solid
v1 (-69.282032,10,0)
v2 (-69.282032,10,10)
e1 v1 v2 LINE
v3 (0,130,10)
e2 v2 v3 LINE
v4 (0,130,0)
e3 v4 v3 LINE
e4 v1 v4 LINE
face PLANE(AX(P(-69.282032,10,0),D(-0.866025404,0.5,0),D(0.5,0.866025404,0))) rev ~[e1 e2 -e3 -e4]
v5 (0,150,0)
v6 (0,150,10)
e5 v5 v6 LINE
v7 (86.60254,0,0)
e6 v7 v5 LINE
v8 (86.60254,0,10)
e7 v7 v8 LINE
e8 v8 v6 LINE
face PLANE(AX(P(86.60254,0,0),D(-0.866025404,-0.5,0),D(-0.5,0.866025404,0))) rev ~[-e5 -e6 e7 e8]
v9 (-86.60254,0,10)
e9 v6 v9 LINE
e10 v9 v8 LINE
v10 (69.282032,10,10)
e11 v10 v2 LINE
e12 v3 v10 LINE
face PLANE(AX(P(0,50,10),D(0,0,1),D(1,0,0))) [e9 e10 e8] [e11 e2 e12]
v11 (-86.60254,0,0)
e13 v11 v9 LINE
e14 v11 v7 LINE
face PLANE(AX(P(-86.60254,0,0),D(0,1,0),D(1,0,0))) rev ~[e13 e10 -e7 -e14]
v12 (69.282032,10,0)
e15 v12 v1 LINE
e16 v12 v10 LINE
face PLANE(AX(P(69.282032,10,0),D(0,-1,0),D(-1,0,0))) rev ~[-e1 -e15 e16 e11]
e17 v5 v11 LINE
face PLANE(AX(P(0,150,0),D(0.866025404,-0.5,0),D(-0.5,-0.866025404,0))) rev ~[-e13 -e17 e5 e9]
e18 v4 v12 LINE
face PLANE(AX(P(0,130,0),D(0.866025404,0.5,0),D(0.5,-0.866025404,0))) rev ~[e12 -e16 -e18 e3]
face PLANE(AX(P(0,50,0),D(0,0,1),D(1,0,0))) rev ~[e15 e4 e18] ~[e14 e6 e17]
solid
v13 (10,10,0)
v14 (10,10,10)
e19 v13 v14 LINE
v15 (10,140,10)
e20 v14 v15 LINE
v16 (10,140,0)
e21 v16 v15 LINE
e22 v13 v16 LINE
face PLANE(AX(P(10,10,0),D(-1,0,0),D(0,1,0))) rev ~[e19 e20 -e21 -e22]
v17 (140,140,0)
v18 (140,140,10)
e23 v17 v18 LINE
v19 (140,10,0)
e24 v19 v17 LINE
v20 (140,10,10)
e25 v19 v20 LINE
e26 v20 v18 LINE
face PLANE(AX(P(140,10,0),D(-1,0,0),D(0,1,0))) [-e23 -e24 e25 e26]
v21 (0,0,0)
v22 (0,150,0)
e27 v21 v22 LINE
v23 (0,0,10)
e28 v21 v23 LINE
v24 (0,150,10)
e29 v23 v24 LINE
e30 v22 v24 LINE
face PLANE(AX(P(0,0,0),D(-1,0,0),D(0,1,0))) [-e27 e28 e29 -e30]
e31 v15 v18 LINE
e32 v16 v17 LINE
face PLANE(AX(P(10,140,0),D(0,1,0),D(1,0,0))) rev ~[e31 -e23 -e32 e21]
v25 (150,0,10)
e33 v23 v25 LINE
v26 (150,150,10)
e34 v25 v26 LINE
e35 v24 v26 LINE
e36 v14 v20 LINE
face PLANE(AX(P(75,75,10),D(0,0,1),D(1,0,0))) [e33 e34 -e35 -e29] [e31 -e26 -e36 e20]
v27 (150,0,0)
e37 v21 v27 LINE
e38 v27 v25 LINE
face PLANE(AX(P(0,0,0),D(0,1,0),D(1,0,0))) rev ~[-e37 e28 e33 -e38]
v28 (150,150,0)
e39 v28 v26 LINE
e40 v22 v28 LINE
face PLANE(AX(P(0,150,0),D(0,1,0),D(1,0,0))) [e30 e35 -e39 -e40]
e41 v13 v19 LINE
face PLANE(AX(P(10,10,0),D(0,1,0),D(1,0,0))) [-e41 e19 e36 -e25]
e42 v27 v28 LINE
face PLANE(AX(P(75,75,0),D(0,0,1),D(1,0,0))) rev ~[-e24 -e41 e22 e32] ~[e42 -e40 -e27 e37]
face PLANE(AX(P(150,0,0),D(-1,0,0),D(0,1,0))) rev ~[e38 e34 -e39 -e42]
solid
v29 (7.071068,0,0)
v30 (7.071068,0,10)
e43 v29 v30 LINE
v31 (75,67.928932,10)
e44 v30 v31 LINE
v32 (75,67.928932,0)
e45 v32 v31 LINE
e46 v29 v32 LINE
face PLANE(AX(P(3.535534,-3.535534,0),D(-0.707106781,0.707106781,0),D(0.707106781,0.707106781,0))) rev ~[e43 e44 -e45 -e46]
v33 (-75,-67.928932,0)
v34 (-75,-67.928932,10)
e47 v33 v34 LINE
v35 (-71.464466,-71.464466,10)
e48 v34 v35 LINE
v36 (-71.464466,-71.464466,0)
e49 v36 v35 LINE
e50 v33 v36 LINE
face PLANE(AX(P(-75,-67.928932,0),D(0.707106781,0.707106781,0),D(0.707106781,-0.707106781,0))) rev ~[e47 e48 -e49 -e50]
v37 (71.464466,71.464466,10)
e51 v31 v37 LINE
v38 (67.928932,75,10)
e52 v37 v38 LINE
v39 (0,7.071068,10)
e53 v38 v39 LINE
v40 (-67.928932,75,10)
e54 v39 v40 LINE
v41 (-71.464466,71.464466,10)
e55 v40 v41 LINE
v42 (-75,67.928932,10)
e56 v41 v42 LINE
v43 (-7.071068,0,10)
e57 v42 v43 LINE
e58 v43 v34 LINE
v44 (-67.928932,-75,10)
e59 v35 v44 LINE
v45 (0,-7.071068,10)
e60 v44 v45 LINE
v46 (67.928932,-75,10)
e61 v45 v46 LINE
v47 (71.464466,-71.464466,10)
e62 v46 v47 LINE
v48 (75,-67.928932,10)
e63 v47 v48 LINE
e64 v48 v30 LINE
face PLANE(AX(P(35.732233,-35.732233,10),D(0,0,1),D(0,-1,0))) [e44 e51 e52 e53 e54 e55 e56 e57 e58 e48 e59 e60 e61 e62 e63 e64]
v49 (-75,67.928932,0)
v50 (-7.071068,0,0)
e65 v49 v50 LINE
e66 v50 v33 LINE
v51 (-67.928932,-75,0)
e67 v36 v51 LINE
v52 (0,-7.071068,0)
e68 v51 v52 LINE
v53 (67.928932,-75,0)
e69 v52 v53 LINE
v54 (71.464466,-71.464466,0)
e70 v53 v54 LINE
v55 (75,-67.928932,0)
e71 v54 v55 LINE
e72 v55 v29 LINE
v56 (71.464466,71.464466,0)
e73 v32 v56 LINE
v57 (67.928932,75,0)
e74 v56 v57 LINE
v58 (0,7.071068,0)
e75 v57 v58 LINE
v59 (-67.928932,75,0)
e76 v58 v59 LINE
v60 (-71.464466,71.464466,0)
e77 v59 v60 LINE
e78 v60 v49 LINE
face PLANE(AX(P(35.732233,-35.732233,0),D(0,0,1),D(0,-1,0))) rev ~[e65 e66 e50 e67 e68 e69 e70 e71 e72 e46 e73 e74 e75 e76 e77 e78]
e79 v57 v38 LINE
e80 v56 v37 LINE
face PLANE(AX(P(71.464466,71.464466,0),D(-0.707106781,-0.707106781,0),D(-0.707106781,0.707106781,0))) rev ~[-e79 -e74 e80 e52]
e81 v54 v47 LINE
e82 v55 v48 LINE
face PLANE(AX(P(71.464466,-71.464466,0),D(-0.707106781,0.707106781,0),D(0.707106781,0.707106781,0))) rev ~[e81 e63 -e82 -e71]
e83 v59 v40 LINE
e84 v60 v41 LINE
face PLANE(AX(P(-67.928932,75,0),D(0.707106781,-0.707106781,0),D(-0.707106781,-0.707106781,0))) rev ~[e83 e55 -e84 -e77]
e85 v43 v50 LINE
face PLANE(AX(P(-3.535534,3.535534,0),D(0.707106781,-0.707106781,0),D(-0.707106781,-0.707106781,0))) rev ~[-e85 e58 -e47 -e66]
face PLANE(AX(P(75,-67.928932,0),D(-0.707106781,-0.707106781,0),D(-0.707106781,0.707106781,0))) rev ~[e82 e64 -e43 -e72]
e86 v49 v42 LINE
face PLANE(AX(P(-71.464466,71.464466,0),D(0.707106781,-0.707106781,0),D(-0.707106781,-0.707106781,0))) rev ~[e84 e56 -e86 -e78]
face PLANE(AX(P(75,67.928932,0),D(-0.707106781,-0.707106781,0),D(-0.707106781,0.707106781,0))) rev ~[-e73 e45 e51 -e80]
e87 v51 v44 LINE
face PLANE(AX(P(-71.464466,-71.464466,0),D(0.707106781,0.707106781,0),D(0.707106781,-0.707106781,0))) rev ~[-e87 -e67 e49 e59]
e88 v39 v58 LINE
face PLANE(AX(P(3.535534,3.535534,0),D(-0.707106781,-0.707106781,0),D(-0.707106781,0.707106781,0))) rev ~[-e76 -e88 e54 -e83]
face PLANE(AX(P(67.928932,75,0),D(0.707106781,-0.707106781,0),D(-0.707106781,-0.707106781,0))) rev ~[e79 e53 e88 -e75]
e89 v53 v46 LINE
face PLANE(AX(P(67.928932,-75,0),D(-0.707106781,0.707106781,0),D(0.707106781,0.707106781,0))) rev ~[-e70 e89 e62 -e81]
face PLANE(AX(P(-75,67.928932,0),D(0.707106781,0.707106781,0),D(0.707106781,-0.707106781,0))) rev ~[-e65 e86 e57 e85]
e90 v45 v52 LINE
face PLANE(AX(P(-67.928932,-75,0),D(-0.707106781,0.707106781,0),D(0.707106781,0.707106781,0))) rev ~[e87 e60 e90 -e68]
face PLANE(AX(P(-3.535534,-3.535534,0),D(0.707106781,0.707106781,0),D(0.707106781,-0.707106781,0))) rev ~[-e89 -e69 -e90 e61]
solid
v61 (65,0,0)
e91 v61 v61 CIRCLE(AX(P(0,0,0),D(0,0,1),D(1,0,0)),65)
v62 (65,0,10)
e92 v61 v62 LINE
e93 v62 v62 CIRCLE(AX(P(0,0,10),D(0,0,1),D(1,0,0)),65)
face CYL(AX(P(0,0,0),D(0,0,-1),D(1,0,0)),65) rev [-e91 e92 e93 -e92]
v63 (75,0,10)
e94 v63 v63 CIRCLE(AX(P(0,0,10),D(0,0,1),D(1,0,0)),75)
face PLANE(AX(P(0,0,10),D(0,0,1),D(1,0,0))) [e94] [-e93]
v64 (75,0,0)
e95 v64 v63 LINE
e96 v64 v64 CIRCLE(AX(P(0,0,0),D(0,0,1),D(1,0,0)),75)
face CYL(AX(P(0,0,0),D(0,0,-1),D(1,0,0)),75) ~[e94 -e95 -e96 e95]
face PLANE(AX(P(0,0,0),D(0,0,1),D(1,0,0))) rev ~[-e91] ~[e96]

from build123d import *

# Parameters (mm, degrees)
F0_W     = 150
F0_H     = 150
F0_W_2   = 130
F0_H_2   = 130
F1_DEPTH = 10
F3_R     = 75
F3_R_2   = 65
F4_DEPTH = 10
F5_DEPTH = 10
F7_DEPTH = 10
F9_COUNT = 4


with BuildPart() as f1:
    # F0 (on Top) → F1 (new body)
    with BuildSketch(Plane.XY):
        with Locations((75, 75)):
            Rectangle(F0_W, F0_H)
        with Locations((75, 75)):
            Rectangle(F0_W_2, F0_H_2, mode=Mode.SUBTRACT)
    extrude(amount=F1_DEPTH)


with BuildPart() as f4:
    # F3 (on Top) → F4 (new body)
    with BuildSketch(Plane.XY):
        Circle(F3_R)
        Circle(F3_R_2, mode=Mode.SUBTRACT)
    extrude(amount=F4_DEPTH)


with BuildPart() as f5:
    # F2 (on Top) → F5 (new body)
    with BuildSketch(Plane.XY):
        Polygon((86.6025403784, 0), (0, 150), (-86.6025403784, 0), align=None)
        Polygon((-69.2820323028, 10), (0, 130), (69.2820323028, 10), align=None, mode=Mode.SUBTRACT)
    extrude(amount=F5_DEPTH)


with BuildPart() as f7:
    # F6 (on Top) → F7 (new body)
    with BuildSketch(Plane.XY):
        Polygon((75, 67.9289321881), (71.4644660941, 71.4644660941), (67.9289321881, 75), (-3.5355339059, 3.5355339059), (0, 0), (3.5355339059, -3.5355339059), align=None)
    extrude(amount=F7_DEPTH)

    # F9: F7 ×4 about axis
    f9_axis = Axis((0, 0, 5), (0, 0, 1))


with BuildPart() as f7_1:
    add(f7.part)
    for i in range(1, F9_COUNT):
        add(f7.part.rotate(f9_axis, i * 360 / F9_COUNT))


solid = Compound([f1.part, f4.part, f5.part, f7_1.part])
